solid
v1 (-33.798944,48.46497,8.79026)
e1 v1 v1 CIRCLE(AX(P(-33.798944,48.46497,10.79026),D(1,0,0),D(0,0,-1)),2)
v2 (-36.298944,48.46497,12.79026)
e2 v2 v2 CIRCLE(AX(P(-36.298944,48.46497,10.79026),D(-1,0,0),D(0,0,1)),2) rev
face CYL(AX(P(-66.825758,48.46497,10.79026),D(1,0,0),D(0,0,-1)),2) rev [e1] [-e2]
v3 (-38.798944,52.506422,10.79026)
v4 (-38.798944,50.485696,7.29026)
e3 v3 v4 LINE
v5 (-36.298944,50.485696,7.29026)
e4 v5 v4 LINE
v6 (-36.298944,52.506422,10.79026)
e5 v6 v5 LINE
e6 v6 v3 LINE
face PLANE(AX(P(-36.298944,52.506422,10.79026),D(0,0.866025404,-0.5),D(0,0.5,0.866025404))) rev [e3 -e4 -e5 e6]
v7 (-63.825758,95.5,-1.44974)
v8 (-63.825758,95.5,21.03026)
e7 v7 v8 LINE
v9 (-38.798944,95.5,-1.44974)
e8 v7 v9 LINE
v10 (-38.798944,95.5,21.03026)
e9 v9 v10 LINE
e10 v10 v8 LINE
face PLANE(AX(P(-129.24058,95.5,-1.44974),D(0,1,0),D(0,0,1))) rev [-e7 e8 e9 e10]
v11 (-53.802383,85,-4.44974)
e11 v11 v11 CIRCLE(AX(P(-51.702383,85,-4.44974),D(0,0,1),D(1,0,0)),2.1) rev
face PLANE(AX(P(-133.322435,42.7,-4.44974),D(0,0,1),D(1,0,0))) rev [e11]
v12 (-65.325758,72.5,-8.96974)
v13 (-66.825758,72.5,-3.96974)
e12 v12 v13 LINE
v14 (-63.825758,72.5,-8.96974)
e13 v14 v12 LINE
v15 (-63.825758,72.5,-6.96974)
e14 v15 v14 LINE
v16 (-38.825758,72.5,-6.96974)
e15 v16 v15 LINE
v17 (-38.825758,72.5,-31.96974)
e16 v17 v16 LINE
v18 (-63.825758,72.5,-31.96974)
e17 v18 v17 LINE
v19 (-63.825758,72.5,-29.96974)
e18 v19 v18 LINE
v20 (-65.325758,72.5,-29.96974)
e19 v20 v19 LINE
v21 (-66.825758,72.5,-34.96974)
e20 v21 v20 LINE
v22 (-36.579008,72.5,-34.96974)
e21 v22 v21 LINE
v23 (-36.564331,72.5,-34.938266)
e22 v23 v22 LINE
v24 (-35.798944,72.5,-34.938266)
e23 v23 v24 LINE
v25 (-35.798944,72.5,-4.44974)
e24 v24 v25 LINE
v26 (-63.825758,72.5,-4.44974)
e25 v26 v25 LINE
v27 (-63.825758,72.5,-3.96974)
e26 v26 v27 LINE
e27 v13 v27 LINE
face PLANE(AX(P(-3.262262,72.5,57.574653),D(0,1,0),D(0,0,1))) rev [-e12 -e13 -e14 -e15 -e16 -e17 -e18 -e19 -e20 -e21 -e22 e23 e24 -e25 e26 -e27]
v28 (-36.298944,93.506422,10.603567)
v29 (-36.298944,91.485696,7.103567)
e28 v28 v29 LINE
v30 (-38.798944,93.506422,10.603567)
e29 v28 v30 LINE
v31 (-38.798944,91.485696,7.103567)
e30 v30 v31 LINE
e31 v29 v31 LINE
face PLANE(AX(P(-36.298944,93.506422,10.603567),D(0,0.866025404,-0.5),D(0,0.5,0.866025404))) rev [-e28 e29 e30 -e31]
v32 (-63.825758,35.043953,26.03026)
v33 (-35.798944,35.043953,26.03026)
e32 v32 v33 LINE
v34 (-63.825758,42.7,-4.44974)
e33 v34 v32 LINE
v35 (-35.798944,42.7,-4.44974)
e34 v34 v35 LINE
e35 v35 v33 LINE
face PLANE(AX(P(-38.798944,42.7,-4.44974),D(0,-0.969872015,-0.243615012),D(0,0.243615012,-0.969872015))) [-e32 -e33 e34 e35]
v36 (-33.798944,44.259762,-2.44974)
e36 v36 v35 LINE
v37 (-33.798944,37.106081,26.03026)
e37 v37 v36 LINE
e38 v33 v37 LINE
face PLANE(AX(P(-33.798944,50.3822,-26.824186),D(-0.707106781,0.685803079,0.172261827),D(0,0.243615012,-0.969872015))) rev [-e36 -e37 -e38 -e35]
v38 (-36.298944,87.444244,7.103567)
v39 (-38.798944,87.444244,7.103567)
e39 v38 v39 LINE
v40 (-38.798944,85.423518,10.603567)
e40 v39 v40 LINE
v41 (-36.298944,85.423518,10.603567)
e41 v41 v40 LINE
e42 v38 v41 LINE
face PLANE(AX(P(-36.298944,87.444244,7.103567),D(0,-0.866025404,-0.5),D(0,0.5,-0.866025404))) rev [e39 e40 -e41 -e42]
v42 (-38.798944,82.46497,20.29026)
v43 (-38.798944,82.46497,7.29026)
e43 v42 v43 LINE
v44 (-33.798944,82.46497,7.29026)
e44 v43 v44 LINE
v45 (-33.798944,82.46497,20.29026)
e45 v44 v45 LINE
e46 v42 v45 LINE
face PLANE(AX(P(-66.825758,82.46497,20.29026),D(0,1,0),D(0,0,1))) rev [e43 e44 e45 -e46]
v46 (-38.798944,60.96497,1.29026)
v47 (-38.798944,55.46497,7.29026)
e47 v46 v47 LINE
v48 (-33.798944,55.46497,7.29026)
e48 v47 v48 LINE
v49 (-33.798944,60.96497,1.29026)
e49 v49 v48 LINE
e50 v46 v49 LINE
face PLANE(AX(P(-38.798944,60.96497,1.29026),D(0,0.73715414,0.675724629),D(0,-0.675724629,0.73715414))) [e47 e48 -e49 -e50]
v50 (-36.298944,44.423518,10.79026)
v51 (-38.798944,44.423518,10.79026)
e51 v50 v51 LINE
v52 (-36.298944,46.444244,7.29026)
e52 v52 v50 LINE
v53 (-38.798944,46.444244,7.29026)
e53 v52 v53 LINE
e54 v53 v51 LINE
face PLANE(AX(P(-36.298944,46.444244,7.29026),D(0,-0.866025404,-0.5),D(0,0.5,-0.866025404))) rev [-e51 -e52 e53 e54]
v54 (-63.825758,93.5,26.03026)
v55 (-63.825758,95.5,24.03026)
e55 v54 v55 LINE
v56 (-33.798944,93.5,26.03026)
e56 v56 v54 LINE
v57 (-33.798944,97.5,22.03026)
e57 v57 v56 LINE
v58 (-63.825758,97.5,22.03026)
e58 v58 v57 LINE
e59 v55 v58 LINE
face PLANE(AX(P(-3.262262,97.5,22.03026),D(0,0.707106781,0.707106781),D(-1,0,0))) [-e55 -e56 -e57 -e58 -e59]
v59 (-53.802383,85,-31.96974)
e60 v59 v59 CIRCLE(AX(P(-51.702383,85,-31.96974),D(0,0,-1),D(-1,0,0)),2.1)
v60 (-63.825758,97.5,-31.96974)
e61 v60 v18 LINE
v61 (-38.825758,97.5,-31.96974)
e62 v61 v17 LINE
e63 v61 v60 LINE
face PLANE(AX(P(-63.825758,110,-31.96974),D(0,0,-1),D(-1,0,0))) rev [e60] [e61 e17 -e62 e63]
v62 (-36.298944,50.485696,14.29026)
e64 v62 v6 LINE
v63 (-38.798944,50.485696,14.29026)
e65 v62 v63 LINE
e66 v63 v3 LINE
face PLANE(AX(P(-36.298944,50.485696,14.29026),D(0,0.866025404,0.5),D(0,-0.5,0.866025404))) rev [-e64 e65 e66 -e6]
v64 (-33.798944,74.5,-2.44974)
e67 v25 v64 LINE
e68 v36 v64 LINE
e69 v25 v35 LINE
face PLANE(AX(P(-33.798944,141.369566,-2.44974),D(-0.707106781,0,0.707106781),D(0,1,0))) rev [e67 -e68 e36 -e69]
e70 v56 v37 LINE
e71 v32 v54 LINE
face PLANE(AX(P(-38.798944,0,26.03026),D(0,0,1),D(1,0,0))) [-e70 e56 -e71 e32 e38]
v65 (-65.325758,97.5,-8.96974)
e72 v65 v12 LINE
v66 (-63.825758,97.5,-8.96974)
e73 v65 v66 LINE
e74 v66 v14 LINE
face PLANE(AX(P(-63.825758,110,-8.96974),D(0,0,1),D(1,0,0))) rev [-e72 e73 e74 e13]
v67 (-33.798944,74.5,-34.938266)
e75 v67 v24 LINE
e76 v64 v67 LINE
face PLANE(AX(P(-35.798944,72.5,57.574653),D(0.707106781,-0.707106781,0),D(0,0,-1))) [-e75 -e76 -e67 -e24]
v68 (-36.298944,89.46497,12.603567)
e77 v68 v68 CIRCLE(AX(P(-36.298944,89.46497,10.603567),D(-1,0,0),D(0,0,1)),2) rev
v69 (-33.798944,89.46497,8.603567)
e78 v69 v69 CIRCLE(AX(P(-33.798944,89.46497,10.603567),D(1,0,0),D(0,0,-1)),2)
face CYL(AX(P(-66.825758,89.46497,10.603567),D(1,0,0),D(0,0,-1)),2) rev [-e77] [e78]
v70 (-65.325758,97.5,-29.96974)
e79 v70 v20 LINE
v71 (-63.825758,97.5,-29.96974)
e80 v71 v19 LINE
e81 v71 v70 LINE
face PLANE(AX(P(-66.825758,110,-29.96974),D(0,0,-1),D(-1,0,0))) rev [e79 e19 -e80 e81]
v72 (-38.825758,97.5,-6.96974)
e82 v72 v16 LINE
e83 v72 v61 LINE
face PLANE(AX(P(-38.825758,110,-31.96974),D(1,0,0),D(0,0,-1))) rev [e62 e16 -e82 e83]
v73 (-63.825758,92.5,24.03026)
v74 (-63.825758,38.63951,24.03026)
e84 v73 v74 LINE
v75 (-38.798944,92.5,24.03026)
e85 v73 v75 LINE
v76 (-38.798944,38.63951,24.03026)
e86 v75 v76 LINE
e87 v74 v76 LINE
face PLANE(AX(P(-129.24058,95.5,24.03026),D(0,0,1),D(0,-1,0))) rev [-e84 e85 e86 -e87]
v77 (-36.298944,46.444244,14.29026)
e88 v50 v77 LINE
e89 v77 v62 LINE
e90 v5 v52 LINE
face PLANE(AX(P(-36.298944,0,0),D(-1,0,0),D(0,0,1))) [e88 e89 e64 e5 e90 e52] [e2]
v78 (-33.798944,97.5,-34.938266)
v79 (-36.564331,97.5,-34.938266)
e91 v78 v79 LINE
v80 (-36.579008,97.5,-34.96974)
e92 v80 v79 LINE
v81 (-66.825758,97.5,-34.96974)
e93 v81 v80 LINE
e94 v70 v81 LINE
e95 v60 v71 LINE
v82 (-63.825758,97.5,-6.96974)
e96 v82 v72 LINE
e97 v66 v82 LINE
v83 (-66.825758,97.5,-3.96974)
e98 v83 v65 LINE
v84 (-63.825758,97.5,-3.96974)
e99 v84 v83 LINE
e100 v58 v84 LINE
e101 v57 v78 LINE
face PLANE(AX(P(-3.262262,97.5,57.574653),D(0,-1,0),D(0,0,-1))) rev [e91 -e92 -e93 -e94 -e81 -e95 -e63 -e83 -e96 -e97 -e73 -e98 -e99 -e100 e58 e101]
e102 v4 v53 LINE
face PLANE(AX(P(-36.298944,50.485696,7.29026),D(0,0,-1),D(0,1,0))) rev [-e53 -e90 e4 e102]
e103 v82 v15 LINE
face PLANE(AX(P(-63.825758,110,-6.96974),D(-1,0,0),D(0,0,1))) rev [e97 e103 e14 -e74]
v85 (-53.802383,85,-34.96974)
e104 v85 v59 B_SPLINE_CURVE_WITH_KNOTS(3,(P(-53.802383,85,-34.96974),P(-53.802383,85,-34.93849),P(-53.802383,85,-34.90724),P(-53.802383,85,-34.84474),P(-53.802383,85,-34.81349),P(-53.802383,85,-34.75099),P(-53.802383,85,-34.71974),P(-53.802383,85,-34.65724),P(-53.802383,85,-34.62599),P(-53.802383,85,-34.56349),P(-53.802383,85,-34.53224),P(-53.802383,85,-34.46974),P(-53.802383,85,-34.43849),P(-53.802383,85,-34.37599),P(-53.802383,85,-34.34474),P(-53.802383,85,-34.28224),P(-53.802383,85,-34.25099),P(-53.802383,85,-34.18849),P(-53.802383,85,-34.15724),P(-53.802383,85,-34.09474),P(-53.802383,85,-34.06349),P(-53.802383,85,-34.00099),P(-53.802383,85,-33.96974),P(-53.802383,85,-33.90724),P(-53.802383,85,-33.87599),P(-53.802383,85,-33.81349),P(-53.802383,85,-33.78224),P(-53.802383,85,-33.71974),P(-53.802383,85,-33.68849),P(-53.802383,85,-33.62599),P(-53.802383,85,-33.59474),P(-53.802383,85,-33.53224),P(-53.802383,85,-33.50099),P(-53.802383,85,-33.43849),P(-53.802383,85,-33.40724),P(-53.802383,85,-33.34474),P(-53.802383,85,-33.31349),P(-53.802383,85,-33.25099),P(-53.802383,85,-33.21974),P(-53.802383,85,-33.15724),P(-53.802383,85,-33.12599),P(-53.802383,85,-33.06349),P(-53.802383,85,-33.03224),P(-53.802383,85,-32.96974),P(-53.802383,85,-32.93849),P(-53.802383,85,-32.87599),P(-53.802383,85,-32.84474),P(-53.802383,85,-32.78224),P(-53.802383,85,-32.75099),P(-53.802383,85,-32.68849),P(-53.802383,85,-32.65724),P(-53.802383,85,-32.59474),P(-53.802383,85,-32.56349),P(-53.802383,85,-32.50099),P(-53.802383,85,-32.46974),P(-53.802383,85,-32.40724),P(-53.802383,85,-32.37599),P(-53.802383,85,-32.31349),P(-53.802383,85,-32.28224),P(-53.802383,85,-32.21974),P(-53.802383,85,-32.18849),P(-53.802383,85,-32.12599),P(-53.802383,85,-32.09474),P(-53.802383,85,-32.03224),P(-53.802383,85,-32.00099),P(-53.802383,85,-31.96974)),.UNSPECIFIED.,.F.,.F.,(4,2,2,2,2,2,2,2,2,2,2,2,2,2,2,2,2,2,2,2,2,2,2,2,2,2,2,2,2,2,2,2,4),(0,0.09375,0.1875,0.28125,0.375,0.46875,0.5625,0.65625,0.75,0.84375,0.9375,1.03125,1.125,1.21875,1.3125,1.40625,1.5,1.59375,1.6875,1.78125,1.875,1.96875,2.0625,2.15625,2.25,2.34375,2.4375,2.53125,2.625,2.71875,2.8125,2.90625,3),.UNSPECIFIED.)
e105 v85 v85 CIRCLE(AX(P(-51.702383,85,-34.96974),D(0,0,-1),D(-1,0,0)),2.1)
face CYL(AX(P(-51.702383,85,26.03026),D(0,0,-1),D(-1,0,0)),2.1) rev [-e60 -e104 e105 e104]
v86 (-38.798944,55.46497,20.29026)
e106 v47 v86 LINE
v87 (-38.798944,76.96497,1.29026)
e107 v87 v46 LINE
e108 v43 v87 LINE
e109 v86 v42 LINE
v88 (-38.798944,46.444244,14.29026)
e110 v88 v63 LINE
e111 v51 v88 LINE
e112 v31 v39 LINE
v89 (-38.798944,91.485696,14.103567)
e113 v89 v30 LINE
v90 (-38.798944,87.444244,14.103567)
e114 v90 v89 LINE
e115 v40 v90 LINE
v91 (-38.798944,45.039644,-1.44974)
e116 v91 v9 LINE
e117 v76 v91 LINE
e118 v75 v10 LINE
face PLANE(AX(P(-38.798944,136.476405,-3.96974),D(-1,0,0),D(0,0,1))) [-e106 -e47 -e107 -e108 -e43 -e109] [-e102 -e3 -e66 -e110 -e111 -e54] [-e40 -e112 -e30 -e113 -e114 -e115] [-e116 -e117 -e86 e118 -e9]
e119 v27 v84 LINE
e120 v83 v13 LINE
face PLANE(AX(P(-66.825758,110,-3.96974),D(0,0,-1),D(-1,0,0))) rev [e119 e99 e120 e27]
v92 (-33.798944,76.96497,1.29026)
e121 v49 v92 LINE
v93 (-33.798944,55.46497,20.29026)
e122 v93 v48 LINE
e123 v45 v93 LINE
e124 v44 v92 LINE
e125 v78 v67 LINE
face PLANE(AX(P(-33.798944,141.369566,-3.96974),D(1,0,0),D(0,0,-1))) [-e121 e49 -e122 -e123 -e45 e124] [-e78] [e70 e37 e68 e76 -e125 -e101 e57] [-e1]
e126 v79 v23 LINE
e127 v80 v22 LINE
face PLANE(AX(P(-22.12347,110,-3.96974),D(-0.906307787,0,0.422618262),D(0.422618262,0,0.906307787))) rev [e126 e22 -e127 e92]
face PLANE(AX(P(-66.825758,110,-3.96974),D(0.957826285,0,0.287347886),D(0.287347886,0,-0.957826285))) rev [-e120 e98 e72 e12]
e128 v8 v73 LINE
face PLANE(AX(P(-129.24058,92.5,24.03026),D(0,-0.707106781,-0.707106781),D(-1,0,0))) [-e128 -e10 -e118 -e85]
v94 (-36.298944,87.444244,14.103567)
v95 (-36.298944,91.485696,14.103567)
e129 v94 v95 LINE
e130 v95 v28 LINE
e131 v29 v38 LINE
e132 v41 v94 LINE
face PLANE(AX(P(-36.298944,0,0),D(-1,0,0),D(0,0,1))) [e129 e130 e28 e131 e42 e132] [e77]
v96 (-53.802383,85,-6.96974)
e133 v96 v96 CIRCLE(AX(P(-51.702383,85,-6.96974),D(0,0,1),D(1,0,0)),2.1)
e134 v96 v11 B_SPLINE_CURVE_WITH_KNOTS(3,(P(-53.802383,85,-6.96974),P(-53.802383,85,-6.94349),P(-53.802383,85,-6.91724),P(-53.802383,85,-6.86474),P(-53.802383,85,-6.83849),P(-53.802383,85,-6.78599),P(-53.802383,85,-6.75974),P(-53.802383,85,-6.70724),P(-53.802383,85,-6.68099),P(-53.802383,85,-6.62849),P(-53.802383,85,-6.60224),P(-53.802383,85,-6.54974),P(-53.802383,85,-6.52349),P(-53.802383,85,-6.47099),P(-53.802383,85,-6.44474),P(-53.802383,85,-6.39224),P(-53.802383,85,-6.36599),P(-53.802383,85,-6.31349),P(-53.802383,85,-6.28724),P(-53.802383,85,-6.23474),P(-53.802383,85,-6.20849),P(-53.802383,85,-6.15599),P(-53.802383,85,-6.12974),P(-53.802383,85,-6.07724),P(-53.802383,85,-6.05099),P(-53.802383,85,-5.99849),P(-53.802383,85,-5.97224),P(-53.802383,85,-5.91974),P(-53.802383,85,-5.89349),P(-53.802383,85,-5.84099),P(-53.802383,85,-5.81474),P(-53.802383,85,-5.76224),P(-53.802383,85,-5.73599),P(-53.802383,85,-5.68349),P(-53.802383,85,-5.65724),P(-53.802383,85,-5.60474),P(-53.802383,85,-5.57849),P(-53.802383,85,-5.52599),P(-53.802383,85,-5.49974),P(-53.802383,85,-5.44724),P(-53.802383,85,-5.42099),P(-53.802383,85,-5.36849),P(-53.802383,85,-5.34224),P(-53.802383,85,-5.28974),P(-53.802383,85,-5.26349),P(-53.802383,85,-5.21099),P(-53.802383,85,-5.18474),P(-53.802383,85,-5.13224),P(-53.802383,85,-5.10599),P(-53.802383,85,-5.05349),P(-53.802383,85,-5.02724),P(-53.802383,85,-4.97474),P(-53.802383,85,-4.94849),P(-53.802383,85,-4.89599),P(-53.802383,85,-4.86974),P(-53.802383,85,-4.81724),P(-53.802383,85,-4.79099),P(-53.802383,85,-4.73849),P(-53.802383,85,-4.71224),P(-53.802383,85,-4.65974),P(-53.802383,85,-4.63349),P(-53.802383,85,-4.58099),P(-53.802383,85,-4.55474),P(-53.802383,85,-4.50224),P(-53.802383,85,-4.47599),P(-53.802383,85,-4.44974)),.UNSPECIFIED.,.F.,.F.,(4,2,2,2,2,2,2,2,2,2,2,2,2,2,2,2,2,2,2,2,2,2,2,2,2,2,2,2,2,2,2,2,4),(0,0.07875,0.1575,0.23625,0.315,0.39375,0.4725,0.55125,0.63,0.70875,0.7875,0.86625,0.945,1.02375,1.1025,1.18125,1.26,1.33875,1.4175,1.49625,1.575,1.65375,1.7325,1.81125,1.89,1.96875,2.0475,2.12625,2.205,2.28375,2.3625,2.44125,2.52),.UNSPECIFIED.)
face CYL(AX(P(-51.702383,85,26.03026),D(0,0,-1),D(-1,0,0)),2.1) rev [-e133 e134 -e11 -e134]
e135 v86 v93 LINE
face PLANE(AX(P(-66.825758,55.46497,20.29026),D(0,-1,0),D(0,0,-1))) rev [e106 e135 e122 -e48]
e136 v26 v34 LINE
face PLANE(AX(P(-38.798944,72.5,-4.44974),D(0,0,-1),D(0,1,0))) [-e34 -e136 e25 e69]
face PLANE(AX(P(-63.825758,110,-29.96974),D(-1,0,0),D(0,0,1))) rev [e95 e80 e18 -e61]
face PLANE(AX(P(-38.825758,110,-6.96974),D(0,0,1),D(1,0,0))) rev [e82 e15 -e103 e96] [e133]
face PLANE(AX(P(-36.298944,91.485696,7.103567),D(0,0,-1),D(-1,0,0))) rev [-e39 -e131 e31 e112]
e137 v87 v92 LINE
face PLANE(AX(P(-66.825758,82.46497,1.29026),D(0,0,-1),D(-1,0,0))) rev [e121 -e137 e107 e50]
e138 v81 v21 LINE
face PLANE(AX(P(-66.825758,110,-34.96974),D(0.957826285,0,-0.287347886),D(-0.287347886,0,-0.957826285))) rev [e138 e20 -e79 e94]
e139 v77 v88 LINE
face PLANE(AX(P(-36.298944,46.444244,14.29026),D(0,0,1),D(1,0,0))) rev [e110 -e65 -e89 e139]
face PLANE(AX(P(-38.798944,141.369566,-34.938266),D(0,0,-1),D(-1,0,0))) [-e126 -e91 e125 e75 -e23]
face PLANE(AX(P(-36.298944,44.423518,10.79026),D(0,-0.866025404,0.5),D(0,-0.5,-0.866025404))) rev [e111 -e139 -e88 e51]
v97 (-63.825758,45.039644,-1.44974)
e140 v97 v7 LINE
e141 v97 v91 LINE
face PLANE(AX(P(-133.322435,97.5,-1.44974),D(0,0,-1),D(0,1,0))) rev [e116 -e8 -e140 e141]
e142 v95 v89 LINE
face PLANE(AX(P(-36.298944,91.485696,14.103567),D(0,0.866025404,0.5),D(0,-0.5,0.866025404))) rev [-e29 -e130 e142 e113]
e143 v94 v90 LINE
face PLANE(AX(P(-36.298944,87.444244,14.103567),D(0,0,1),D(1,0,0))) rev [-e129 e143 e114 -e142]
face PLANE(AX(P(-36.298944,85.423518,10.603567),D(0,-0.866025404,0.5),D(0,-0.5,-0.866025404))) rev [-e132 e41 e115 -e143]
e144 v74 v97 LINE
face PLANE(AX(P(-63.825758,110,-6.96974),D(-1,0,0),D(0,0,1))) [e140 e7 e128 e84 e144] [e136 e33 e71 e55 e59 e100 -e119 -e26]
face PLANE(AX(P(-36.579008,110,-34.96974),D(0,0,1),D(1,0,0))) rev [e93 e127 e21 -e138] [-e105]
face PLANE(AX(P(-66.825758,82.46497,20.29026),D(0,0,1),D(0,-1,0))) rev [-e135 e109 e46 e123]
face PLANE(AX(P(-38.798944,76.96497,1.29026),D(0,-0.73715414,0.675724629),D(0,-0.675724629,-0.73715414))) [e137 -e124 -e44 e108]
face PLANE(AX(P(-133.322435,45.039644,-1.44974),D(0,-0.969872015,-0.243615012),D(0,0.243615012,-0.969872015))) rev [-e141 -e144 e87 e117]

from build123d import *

# Parameters (mm, degrees)
EXTRUDE_1_DEPTH           = 110
CUT_EXTRUDE_4_DEPTH       = 134.373777696
SKETCH_7_W                = 16.60831278
SKETCH_7_H                = 38.473598513
CUT_EXTRUDE_14_DEPTH      = 134.373777696
SKETCH_8_W                = 5
SKETCH_8_H                = 30.968526609
EXTRUDE_2_DEPTH           = 110
SKETCH_10_W               = 5
SKETCH_10_H               = 26
EXTRUDE_4_DEPTH           = 110
SKETCH_16_W               = 45
SKETCH_16_H               = 4
EXTRUDE_7_DEPTH           = 110
SKETCH_18_W               = 113.67218818
SKETCH_18_H               = 61.649849458
CUT_EXTRUDE_18_DEPTH      = 137.586229955
SKETCH_19_R               = 2.1
SKETCH_19_R_2             = 2
CUT_EXTRUDE_19_DEPTH      = 143.431323365
SKETCH_22_W               = 25
SKETCH_22_H               = 3
EXTRUDE_10_DEPTH          = 50
SKETCH_23_R               = 2
CUT_EXTRUDE_24_DEPTH      = 10
CUT_EXTRUDE_25_DEPTH      = 138.145152867
CUT_EXTRUDE_25_DEPTH_BACK = 138.145152867
SKETCH_24_W               = 94.85705968
SKETCH_24_H               = 31.336652995
SKETCH_24_W_2             = 96.91469655
SKETCH_24_H_2             = 33.70168341
SKETCH_26_W               = 42.056158723
SKETCH_26_H               = 66.577758737
CUT_EXTRUDE_26_DEPTH      = 85.230722286
EXTRUDE_11_DEPTH          = 5
SKETCH_28_R               = 2
SKETCH_28_W               = 19
SKETCH_28_H               = 27
CUT_EXTRUDE_27_DEPTH      = 109.719377855
EXTRUDE_13_DEPTH          = 5
EXTRUDE_14_DEPTH          = 25.02681365
EXTRUDE_15_DEPTH          = 25.02681365
CHAMFER_1_SIZE            = 4
CHAMFER_2_SIZE            = 3
CUT_EXTRUDE_28_DEPTH      = 2.5
CHAMFER_3_SIZE            = 2
CHAMFER_4_SIZE            = 2


with BuildPart() as part:
    # Эскиз1 → Бобышка-Вытянуть1 (new body)
    with BuildSketch(Plane(origin=(0, 0, 0), x_dir=(1, 0, 0), z_dir=(0, 1, 0))):
        Polygon((-66.825757576, 34.969739794), (-66.825757576, 29.969739794), (-63.825757576, 29.969739794), (-63.825757576, 31.969739794), (-38.825757576, 31.969739794), (-38.825757576, 6.969739794), (-63.825757576, 6.969739794), (-63.825757576, 8.969739794), (-66.825757576, 8.969739794), (-66.825757576, 3.969739794), (-22.123470102, 3.969739794), (-36.579007505, 34.969739794), align=None)
    extrude(amount=EXTRUDE_1_DEPTH)

    # Эскиз3 → Вырез-Вытянуть4 (cut, through all)
    with BuildSketch(Plane.XZ):
        Polygon((-66.825757576, -3.969739794), (-65.325757576, -8.969739794), (-66.825757576, -8.969739794), align=None)
        Polygon((-66.825757576, -29.969739794), (-66.825757576, -34.969739794), (-65.325757576, -29.969739794), align=None)
    extrude(amount=-CUT_EXTRUDE_4_DEPTH, mode=Mode.SUBTRACT)

    # Эскиз7 → Вырез-Вытянуть14 (cut, through all)
    with BuildSketch(Plane(origin=(0, 0, 0), x_dir=(-1, 0, 0), z_dir=(0, -1, 0))):
        with Locations((27.703474463, 20.539743139)):
            Rectangle(SKETCH_7_W, SKETCH_7_H)
    extrude(amount=-CUT_EXTRUDE_14_DEPTH, mode=Mode.SUBTRACT)

    # Эскиз8 → Бобышка-Вытянуть2 (add)
    with BuildSketch(Plane(origin=(0, 0, 0), x_dir=(-1, 0, 0), z_dir=(0, -1, 0))):
        with Locations((36.298943925, 19.454003098)):
            Rectangle(SKETCH_8_W, SKETCH_8_H)
    extrude(amount=-EXTRUDE_2_DEPTH)

    # Эскиз10 → Бобышка-Вытянуть4 (add)
    with BuildSketch(Plane.XZ):
        with Locations((-36.298943925, 9.030260206)):
            Rectangle(SKETCH_10_W, SKETCH_10_H)
    extrude(amount=-EXTRUDE_4_DEPTH)

    # Эскиз16 → Бобышка-Вытянуть7 (add, through all)
    with BuildSketch(Plane(origin=(0, 110, 0), x_dir=(1, 0, 0), z_dir=(0, 1, 0))):
        with Locations((-16.298943925, -24.030260206)):
            Rectangle(SKETCH_16_W, SKETCH_16_H)
    extrude(amount=-EXTRUDE_7_DEPTH)

    # Эскиз18 → Вырез-Вытянуть18 (cut, through all)
    with BuildSketch(Plane(origin=(6.201056075, 0, 0), x_dir=(0, 0, -1), z_dir=(1, 0, 0))):
        with Locations((3.709673157, 29.175075271)):
            Rectangle(SKETCH_18_W, SKETCH_18_H)
    extrude(amount=-CUT_EXTRUDE_18_DEPTH, mode=Mode.SUBTRACT)

    # Эскиз19 → Вырез-Вытянуть19 (cut, through all)
    with BuildSketch(Plane(origin=(0, 0, -34.969739794), x_dir=(-1, 0, 0), z_dir=(0, 0, -1))):
        with Locations((51.70238254, 85)):
            Circle(SKETCH_19_R)
        with Locations((3.798943925, 85)):
            Circle(SKETCH_19_R_2)
    extrude(amount=-CUT_EXTRUDE_19_DEPTH, mode=Mode.SUBTRACT)

    # Эскиз22 → Бобышка-Вытянуть10 (add)
    with BuildSketch(Plane.XZ.offset(-60)):
        with Locations((-21.298943925, -30.469739794)):
            Rectangle(SKETCH_22_W, SKETCH_22_H)
    extrude(amount=-EXTRUDE_10_DEPTH)

    # Эскиз23 → Вырез-Вытянуть24 (cut)
    with BuildSketch(Plane(origin=(0, 0, -31.969739794), x_dir=(-1, 0, 0), z_dir=(0, 0, -1))):
        with Locations((21.298943925, 85)):
            Circle(SKETCH_23_R)
    extrude(amount=-CUT_EXTRUDE_24_DEPTH, mode=Mode.SUBTRACT)

    # Эскиз24 → Вырез-Вытянуть25 (cut, two sides: drawn at the far end of the back side and taken through both)
    with BuildSketch(Plane(origin=(-62.400623407, 0, -18.720187022), x_dir=(-0.2873478855663458, 0, 0.9578262852211513), z_dir=(-0.9578262852211514, 0, -0.2873478855663458)).offset(-CUT_EXTRUDE_25_DEPTH_BACK)):
        with Locations((8.655390038, 113.168326498)):
            Rectangle(SKETCH_24_W, SKETCH_24_H)
        with Locations((7.626571603, 55.649158295)):
            Rectangle(SKETCH_24_W_2, SKETCH_24_H_2)
    extrude(amount=CUT_EXTRUDE_25_DEPTH + CUT_EXTRUDE_25_DEPTH_BACK, mode=Mode.SUBTRACT)

    # Эскиз26 → Вырез-Вытянуть26 (cut, through all)
    with BuildSketch(Plane.XZ.offset(-60)):
        with Locations((-12.770864564, -1.649387034)):
            Rectangle(SKETCH_26_W, SKETCH_26_H)
    extrude(amount=-CUT_EXTRUDE_26_DEPTH, mode=Mode.SUBTRACT)

    # Эскиз27 → Бобышка-Вытянуть11 (add)
    with BuildSketch(Plane(origin=(-33.798943925, 0, 0), x_dir=(0, 0, -1), z_dir=(1, 0, 0))):
        Polygon((-26.030260206, 72.5), (4.449739794, 72.5), (4.449739794, 42.7), (-26.030260206, 35.043953179), align=None)
    extrude(amount=-EXTRUDE_11_DEPTH)

    # Эскиз28 → Вырез-Вытянуть27 (cut, through all)
    with BuildSketch(Plane(origin=(-33.798943925, 0, 0), x_dir=(0, 0, -1), z_dir=(1, 0, 0))):
        with Locations((-10.603567011, 89.464970071)):
            Circle(SKETCH_28_R)
        with Locations((-10.790260206, 48.464970071)):
            Circle(SKETCH_28_R)
        with Locations((-10.790260206, 68.964970071)):
            Rectangle(SKETCH_28_W, SKETCH_28_H)
    extrude(amount=-CUT_EXTRUDE_27_DEPTH, mode=Mode.SUBTRACT)

    # Эскиз29 → Бобышка-Вытянуть13 (add)
    with BuildSketch(Plane(origin=(-33.798943925, 0, 0), x_dir=(0, 0, -1), z_dir=(1, 0, 0))):
        Polygon((-7.290260206, 82.464970071), (-1.290260206, 82.464970071), (-1.290260206, 76.964970071), align=None)
        Polygon((-1.290260206, 60.964970071), (-7.290260206, 55.464970071), (-1.290260206, 55.464970071), align=None)
    extrude(amount=-EXTRUDE_13_DEPTH)

    # Эскиз30 → Бобышка-Вытянуть14 (add)
    with BuildSketch(Plane.ZY.offset(38.798943925)):
        Polygon((-4.449739794, 42.7), (-4.449739794, 97.5), (-1.449739794, 97.5), (-1.449739794, 45.039643715), (26.030260206, 38.137144809), (26.030260206, 35.043953179), align=None)
    extrude(amount=EXTRUDE_14_DEPTH)

    # Эскиз32 → Бобышка-Вытянуть15 (add)
    with BuildSketch(Plane.ZY.offset(38.798943925)):
        Polygon((-1.449739794, 97.5), (26.030260206, 97.5), (26.030260206, 38.137144809), (24.030260206, 38.639510086), (24.030260206, 95.5), (-1.449739794, 95.5), align=None)
    extrude(amount=EXTRUDE_15_DEPTH)

    # Фаска1
    chamfer_1_edges = [part.edges().sort_by_distance(p)[0] for p in [
        (-48.81235075, 97.5, 26.030260206),
    ]]
    chamfer(chamfer_1_edges, length=CHAMFER_1_SIZE - 0.0001)  # a hair under: the kernel refuses the full size

    # Фаска2
    chamfer_2_edges = [part.edges().sort_by_distance(p)[0] for p in [
        (-51.31235075, 95.5, 24.030260206),
    ]]
    chamfer(chamfer_2_edges, length=CHAMFER_2_SIZE)

    # Эскиз33 → Вырез-Вытянуть28 (cut)
    with BuildSketch(Plane.ZY.offset(38.798943925)):
        Polygon((10.603567011, 93.506421955), (7.103567011, 91.485696013), (7.103567011, 87.444244129), (10.603567011, 85.423518186), (14.103567011, 87.444244129), (14.103567011, 91.485696013), align=None)
        Polygon((10.790260206, 52.506421955), (7.290260206, 50.485696013), (7.290260206, 46.444244129), (10.790260206, 44.423518186), (14.290260206, 46.444244129), (14.290260206, 50.485696013), align=None)
    extrude(amount=-CUT_EXTRUDE_28_DEPTH, mode=Mode.SUBTRACT)

    # Фаска3
    chamfer_3_edges = [part.edges().sort_by_distance(p)[0] for p in [
        (-33.798943925, 72.5, -19.694003099),
        (-33.798943925, 57.6, -4.449739794),
    ]]
    chamfer(chamfer_3_edges, length=CHAMFER_3_SIZE)

    # Фаска4
    chamfer_4_edges = [part.edges().sort_by_distance(p)[0] for p in [
        (-33.798943925, 38.620793951, 11.790260206),
    ]]
    chamfer(chamfer_4_edges, length=CHAMFER_4_SIZE)


solid = part.part
